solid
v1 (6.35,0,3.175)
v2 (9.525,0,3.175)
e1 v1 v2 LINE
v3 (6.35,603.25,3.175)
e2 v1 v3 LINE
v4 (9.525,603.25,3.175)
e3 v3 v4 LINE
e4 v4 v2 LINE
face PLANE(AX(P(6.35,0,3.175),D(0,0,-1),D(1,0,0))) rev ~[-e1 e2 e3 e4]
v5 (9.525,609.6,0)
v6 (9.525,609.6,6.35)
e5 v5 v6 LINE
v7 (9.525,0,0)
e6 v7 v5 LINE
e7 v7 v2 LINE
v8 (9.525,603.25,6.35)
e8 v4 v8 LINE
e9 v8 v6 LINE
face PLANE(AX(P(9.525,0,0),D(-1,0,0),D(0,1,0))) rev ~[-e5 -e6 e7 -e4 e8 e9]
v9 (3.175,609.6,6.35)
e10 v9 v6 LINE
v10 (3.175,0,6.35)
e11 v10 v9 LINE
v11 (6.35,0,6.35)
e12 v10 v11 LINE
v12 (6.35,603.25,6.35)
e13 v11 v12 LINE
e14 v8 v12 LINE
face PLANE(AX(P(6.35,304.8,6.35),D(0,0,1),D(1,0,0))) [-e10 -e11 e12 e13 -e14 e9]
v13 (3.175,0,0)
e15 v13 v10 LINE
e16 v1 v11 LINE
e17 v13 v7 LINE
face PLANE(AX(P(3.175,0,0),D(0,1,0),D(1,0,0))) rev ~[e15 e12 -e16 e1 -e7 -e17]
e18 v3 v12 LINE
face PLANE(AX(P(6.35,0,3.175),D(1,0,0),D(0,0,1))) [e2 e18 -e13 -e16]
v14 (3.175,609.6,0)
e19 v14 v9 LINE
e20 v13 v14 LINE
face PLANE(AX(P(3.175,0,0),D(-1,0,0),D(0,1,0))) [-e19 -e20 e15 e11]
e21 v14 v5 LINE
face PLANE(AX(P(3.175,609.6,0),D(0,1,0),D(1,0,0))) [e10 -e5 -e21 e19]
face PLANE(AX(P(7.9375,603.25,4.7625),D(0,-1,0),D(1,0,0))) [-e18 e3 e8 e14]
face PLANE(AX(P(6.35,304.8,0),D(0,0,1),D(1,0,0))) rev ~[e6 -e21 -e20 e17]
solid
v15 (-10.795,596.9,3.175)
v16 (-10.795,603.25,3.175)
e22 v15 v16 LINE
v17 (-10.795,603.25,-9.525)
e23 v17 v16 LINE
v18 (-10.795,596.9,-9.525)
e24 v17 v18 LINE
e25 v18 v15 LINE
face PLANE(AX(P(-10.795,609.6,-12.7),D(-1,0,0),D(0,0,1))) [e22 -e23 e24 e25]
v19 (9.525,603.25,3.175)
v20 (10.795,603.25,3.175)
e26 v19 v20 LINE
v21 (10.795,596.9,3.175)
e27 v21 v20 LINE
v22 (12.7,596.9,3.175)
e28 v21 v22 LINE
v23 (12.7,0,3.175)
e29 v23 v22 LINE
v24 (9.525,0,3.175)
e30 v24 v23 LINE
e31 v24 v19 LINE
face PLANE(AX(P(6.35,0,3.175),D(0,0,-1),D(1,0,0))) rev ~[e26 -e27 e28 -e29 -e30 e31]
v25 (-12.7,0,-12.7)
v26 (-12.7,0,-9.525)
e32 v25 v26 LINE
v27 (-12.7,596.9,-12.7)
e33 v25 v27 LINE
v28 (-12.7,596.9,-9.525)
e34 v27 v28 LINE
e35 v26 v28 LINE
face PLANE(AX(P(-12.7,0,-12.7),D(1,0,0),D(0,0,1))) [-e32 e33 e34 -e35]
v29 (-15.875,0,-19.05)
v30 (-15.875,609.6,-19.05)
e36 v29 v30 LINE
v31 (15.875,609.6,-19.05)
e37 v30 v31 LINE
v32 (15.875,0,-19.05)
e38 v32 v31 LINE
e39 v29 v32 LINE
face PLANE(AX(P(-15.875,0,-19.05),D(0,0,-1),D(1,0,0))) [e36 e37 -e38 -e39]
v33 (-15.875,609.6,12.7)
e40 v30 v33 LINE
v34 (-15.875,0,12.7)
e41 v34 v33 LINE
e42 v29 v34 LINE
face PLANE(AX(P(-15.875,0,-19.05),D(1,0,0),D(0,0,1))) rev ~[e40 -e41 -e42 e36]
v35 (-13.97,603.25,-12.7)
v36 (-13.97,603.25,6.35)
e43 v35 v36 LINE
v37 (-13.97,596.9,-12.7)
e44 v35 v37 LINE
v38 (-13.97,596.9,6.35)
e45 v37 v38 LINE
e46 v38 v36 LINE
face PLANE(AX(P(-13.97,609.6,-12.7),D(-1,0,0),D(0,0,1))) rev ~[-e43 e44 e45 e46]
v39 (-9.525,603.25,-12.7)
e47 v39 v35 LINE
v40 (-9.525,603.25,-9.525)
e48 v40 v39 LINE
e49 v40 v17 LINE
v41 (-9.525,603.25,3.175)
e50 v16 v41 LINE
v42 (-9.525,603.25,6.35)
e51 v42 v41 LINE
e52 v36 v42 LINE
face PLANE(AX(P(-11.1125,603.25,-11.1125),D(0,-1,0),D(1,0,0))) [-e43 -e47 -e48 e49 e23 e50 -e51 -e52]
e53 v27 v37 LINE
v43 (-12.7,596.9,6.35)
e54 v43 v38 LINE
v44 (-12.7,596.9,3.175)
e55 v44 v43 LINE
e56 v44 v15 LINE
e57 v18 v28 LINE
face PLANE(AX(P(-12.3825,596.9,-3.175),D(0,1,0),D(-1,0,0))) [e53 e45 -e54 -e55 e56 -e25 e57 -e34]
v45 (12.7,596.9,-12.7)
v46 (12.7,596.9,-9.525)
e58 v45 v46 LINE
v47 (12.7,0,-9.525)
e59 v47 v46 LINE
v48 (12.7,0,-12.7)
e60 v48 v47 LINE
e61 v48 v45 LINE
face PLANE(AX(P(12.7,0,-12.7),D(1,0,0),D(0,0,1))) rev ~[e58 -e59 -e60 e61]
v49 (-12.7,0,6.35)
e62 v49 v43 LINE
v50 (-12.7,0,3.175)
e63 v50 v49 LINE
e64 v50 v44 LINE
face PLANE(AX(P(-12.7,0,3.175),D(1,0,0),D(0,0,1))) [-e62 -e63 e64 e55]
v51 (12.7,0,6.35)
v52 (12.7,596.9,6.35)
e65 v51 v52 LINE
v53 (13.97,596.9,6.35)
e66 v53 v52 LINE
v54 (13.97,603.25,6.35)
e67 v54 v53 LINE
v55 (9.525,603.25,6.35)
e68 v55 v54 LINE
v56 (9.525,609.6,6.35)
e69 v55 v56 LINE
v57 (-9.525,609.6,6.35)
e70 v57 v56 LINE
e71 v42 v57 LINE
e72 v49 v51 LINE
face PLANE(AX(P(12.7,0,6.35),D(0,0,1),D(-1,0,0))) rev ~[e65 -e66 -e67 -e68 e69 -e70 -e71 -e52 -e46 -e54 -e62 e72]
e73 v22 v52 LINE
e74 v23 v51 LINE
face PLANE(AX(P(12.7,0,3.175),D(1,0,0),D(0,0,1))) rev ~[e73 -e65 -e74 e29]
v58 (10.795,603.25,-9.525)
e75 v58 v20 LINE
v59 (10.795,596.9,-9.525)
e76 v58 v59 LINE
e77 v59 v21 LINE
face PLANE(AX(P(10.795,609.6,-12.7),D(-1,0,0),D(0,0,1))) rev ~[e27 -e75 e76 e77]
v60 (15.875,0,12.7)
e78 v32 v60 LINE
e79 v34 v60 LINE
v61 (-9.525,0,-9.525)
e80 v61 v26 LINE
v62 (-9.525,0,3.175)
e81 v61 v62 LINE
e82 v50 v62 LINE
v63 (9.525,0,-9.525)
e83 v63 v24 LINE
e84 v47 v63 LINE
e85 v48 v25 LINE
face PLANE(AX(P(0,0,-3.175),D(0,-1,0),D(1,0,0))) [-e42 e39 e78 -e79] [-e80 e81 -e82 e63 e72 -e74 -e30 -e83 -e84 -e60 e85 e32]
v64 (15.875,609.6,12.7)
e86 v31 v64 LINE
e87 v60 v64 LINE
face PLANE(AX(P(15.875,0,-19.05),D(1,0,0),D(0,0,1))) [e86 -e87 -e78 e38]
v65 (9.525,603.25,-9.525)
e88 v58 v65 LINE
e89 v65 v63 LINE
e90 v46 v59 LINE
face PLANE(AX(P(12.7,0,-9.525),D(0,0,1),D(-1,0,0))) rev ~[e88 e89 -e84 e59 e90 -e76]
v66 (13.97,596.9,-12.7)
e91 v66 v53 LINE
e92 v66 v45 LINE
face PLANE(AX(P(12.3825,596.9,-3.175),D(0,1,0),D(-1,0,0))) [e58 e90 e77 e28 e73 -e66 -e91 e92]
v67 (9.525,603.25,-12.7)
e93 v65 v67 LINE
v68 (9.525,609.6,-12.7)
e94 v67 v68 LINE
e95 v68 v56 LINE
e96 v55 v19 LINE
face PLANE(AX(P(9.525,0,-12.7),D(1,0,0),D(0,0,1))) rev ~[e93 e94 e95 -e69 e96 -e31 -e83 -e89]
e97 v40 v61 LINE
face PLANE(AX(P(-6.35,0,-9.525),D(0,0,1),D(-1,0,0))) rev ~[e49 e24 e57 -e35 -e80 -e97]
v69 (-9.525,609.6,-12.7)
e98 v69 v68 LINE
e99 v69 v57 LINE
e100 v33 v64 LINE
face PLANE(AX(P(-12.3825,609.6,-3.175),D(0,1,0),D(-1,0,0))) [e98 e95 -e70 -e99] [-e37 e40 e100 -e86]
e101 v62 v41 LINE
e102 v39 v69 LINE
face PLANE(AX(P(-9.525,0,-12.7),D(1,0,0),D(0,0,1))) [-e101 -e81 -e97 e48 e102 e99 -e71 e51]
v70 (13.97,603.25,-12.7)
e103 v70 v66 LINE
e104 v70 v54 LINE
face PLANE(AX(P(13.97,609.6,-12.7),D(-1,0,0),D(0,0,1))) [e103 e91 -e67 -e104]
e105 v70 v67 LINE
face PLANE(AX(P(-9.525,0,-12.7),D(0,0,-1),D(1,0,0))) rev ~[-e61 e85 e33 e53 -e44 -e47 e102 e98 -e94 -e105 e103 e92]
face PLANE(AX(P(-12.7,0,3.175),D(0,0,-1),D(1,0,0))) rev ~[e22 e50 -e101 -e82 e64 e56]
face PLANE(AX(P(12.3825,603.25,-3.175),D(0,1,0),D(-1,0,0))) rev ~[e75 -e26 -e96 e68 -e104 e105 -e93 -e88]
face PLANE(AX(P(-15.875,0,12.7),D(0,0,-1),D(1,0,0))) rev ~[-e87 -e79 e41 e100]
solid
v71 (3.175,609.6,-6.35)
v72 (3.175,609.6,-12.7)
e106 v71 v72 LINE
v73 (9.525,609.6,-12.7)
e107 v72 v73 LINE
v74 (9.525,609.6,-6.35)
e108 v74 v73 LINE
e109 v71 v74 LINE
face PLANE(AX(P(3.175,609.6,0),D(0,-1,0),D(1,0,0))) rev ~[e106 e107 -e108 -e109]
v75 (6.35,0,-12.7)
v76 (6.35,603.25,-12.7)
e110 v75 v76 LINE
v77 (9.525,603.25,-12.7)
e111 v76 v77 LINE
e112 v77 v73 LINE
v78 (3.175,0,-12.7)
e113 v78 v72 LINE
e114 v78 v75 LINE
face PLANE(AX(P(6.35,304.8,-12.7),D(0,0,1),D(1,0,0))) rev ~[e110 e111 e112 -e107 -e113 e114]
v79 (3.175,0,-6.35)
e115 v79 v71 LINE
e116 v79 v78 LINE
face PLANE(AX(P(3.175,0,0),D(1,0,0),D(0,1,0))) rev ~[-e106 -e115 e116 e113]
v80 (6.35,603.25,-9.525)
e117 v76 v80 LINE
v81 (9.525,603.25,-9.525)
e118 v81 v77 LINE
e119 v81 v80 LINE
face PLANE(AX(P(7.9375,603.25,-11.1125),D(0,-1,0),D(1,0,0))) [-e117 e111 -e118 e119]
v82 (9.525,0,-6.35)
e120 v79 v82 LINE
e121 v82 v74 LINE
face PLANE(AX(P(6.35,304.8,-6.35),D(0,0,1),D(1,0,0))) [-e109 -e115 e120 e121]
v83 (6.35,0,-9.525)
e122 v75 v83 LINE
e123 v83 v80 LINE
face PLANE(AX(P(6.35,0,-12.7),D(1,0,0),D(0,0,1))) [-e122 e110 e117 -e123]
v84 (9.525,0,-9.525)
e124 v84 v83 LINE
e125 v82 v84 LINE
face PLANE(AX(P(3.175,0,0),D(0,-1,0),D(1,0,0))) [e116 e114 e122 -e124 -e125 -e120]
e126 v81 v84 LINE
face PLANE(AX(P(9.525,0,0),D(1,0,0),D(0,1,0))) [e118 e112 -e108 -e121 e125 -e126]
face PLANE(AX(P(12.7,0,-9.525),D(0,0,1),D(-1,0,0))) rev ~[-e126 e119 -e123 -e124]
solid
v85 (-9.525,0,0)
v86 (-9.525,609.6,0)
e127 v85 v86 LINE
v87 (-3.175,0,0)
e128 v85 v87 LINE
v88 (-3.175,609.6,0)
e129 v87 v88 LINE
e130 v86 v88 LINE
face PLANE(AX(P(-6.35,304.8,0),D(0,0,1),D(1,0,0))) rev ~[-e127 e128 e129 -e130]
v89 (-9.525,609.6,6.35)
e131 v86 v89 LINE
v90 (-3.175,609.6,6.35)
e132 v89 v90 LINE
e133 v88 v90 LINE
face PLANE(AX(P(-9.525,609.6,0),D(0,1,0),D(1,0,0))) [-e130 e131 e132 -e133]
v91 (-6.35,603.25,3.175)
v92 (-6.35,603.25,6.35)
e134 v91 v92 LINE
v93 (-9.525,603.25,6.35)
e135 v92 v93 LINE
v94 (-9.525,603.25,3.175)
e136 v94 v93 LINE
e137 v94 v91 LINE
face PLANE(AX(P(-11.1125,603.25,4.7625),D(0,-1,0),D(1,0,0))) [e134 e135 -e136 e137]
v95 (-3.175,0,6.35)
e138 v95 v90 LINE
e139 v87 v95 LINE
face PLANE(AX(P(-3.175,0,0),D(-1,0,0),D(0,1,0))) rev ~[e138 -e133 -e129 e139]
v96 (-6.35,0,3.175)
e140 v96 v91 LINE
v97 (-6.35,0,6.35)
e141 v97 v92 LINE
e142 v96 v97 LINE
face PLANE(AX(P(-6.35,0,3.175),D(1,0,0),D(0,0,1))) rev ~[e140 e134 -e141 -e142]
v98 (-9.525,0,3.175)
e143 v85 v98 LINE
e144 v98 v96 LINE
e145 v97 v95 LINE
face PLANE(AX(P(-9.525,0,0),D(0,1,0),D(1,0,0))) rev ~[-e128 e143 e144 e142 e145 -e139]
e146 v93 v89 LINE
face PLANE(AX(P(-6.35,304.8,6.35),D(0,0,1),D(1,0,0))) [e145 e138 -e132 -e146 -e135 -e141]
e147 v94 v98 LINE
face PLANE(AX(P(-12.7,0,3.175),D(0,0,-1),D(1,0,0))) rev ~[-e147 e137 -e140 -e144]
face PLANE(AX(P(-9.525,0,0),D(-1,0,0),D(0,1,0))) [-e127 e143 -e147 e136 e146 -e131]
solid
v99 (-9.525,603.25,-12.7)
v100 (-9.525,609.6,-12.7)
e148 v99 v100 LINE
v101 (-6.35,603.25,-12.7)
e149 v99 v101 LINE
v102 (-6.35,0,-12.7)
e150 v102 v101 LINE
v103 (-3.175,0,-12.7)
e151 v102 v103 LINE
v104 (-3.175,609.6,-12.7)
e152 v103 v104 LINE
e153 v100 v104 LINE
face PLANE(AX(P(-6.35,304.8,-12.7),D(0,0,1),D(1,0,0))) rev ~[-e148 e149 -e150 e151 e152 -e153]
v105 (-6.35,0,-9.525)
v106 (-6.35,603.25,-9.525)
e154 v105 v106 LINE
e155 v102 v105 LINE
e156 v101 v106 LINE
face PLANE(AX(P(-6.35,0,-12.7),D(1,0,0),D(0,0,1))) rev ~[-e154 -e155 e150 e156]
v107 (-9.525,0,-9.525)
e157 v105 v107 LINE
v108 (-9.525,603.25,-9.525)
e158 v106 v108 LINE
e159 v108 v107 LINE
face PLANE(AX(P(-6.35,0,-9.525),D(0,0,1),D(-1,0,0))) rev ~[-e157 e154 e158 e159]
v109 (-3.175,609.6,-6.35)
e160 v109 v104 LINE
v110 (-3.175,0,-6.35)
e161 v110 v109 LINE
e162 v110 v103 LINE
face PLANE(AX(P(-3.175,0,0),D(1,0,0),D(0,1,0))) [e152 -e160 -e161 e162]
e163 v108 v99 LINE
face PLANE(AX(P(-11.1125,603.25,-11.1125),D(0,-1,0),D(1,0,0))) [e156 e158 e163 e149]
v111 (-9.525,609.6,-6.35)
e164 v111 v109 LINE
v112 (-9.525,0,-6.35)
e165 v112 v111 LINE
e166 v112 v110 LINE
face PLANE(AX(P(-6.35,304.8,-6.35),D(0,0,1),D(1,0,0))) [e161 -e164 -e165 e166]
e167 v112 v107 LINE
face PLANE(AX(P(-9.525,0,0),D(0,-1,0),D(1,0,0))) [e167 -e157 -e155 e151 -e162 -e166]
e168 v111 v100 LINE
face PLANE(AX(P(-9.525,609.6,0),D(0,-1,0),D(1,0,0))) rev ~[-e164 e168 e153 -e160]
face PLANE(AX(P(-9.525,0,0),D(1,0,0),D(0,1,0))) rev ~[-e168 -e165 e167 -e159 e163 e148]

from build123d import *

# Parameters (mm, degrees)
F0_W      = 6.35
F0_H      = 609.6
F1_DEPTH  = 6.35
F2_DEPTH  = 12.7
F3_DEPTH  = 6.35
F4_W      = 31.75
F4_H      = 31.75
F4_W_2    = 19.05
F4_H_2    = 19.05
F5_DEPTH  = 609.6
F6_W      = 3.175
F6_H      = 3.175
F7_DEPTH  = 603.25
F8_W      = 3.175
F8_H      = 19.05
F9_DEPTH  = 12.7
F10_DEPTH = 6.35
F11_DEPTH = 12.7
F12_DEPTH = 6.35


with BuildPart() as f1:
    # F0 (on Top) → F1 (new body)
    with BuildSketch(Plane.XY):
        with Locations((-6.35, 304.8)):
            Rectangle(F0_W, F0_H)
    extrude(amount=F1_DEPTH)


with BuildPart() as f1b:
    # F0 (on Top) → F1, piece 2 (new body)
    with BuildSketch(Plane.XY):
        with Locations((6.35, 304.8)):
            Rectangle(F0_W, F0_H)
    extrude(amount=F1_DEPTH)


with BuildPart() as f2:
    # F0 (on Top) → F2 (new body)
    with BuildSketch(Plane.XY):
        with Locations((6.35, 304.8)):
            Rectangle(F0_W, F0_H)
    extrude(amount=-F2_DEPTH)


with BuildPart() as f2b:
    # F0 (on Top) → F2, piece 2 (new body)
    with BuildSketch(Plane.XY):
        with Locations((-6.35, 304.8)):
            Rectangle(F0_W, F0_H)
    extrude(amount=-F2_DEPTH)


with BuildPart() as f3_tool:
    # F0 (on Top) → F3 (new body)
    with BuildSketch(Plane.XY):
        with Locations((6.35, 304.8)):
            Rectangle(F0_W, F0_H)
        with Locations((-6.35, 304.8)):
            Rectangle(F0_W, F0_H)
    extrude(amount=-F3_DEPTH)


with BuildPart() as f2_1:
    add(f2.part)

    # F3: cut by f3_tool
    add(f3_tool.part, mode=Mode.SUBTRACT)


with BuildPart() as f2b_1:
    add(f2b.part)

    # F3: cut by f3_tool
    add(f3_tool.part, mode=Mode.SUBTRACT)


with BuildPart() as f5:
    # F4 (on Front) → F5 (new body)
    with BuildSketch(Plane.XZ):
        with Locations((0, -3.175)):
            Rectangle(F4_W, F4_H)
        with Locations((0, -3.175)):
            Rectangle(F4_W_2, F4_H_2, mode=Mode.SUBTRACT)
    extrude(amount=-F5_DEPTH)


with BuildPart() as f7_tool:
    # F6 (on face) → F7 (new body)
    with BuildSketch(Plane.XZ):
        with Locations((-11.1125, 4.7625)):
            Rectangle(F6_W, F6_H)
        with Locations((-7.9375, 4.7625)):
            Rectangle(F6_W, F6_H)
        with Locations((7.9375, 4.7625)):
            Rectangle(F6_W, F6_H)
        with Locations((11.1125, 4.7625)):
            Rectangle(F6_W, F6_H)
        with Locations((-11.1125, -11.1125)):
            Rectangle(F6_W, F6_H)
        with Locations((-7.9375, -11.1125)):
            Rectangle(F6_W, F6_H)
        with Locations((7.9375, -11.1125)):
            Rectangle(F6_W, F6_H)
        with Locations((11.1125, -11.1125)):
            Rectangle(F6_W, F6_H)
    extrude(amount=-F7_DEPTH)


with BuildPart() as f1_1:
    add(f1.part)

    # F7: cut by f7_tool
    add(f7_tool.part, mode=Mode.SUBTRACT)


with BuildPart() as f1b_1:
    add(f1b.part)

    # F7: cut by f7_tool
    add(f7_tool.part, mode=Mode.SUBTRACT)


with BuildPart() as f2_2:
    add(f2_1.part)

    # F7: cut by f7_tool
    add(f7_tool.part, mode=Mode.SUBTRACT)


with BuildPart() as f2b_2:
    add(f2b_1.part)

    # F7: cut by f7_tool
    add(f7_tool.part, mode=Mode.SUBTRACT)


with BuildPart() as f5_1:
    add(f5.part)

    # F7: cut by f7_tool
    add(f7_tool.part, mode=Mode.SUBTRACT)

    # F8 (on face) → F9 (cut)
    with BuildSketch(Plane(origin=(0, 609.6, 0), x_dir=(-1, 0, 0), z_dir=(0, 1, 0))):
        with Locations((-12.3825, -3.175)):
            Rectangle(F8_W, F8_H)
        with Locations((12.3825, -3.175)):
            Rectangle(F8_W, F8_H)
    extrude(amount=-F9_DEPTH, mode=Mode.SUBTRACT)

    # F8 (on face) → F10 (join)
    with BuildSketch(Plane(origin=(0, 609.6, 0), x_dir=(-1, 0, 0), z_dir=(0, 1, 0))):
        with Locations((-12.3825, -3.175)):
            Rectangle(F8_W, F8_H)
        with Locations((12.3825, -3.175)):
            Rectangle(F8_W, F8_H)
    extrude(amount=-F10_DEPTH)

    # F8 (on face) → F11 (cut)
    with BuildSketch(Plane(origin=(0, 609.6, 0), x_dir=(-1, 0, 0), z_dir=(0, 1, 0))):
        with Locations((12.3825, -3.175)):
            Rectangle(F8_W, F8_H)
    extrude(amount=-F11_DEPTH, mode=Mode.SUBTRACT)

    # F8 (on face) → F12 (join)
    with BuildSketch(Plane(origin=(0, 609.6, 0), x_dir=(-1, 0, 0), z_dir=(0, 1, 0))):
        with Locations((12.3825, -3.175)):
            Rectangle(F8_W, F8_H)
    extrude(amount=-F12_DEPTH)


solid = Compound([f1_1.part, f1b_1.part, f2_2.part, f2b_2.part, f5_1.part])
